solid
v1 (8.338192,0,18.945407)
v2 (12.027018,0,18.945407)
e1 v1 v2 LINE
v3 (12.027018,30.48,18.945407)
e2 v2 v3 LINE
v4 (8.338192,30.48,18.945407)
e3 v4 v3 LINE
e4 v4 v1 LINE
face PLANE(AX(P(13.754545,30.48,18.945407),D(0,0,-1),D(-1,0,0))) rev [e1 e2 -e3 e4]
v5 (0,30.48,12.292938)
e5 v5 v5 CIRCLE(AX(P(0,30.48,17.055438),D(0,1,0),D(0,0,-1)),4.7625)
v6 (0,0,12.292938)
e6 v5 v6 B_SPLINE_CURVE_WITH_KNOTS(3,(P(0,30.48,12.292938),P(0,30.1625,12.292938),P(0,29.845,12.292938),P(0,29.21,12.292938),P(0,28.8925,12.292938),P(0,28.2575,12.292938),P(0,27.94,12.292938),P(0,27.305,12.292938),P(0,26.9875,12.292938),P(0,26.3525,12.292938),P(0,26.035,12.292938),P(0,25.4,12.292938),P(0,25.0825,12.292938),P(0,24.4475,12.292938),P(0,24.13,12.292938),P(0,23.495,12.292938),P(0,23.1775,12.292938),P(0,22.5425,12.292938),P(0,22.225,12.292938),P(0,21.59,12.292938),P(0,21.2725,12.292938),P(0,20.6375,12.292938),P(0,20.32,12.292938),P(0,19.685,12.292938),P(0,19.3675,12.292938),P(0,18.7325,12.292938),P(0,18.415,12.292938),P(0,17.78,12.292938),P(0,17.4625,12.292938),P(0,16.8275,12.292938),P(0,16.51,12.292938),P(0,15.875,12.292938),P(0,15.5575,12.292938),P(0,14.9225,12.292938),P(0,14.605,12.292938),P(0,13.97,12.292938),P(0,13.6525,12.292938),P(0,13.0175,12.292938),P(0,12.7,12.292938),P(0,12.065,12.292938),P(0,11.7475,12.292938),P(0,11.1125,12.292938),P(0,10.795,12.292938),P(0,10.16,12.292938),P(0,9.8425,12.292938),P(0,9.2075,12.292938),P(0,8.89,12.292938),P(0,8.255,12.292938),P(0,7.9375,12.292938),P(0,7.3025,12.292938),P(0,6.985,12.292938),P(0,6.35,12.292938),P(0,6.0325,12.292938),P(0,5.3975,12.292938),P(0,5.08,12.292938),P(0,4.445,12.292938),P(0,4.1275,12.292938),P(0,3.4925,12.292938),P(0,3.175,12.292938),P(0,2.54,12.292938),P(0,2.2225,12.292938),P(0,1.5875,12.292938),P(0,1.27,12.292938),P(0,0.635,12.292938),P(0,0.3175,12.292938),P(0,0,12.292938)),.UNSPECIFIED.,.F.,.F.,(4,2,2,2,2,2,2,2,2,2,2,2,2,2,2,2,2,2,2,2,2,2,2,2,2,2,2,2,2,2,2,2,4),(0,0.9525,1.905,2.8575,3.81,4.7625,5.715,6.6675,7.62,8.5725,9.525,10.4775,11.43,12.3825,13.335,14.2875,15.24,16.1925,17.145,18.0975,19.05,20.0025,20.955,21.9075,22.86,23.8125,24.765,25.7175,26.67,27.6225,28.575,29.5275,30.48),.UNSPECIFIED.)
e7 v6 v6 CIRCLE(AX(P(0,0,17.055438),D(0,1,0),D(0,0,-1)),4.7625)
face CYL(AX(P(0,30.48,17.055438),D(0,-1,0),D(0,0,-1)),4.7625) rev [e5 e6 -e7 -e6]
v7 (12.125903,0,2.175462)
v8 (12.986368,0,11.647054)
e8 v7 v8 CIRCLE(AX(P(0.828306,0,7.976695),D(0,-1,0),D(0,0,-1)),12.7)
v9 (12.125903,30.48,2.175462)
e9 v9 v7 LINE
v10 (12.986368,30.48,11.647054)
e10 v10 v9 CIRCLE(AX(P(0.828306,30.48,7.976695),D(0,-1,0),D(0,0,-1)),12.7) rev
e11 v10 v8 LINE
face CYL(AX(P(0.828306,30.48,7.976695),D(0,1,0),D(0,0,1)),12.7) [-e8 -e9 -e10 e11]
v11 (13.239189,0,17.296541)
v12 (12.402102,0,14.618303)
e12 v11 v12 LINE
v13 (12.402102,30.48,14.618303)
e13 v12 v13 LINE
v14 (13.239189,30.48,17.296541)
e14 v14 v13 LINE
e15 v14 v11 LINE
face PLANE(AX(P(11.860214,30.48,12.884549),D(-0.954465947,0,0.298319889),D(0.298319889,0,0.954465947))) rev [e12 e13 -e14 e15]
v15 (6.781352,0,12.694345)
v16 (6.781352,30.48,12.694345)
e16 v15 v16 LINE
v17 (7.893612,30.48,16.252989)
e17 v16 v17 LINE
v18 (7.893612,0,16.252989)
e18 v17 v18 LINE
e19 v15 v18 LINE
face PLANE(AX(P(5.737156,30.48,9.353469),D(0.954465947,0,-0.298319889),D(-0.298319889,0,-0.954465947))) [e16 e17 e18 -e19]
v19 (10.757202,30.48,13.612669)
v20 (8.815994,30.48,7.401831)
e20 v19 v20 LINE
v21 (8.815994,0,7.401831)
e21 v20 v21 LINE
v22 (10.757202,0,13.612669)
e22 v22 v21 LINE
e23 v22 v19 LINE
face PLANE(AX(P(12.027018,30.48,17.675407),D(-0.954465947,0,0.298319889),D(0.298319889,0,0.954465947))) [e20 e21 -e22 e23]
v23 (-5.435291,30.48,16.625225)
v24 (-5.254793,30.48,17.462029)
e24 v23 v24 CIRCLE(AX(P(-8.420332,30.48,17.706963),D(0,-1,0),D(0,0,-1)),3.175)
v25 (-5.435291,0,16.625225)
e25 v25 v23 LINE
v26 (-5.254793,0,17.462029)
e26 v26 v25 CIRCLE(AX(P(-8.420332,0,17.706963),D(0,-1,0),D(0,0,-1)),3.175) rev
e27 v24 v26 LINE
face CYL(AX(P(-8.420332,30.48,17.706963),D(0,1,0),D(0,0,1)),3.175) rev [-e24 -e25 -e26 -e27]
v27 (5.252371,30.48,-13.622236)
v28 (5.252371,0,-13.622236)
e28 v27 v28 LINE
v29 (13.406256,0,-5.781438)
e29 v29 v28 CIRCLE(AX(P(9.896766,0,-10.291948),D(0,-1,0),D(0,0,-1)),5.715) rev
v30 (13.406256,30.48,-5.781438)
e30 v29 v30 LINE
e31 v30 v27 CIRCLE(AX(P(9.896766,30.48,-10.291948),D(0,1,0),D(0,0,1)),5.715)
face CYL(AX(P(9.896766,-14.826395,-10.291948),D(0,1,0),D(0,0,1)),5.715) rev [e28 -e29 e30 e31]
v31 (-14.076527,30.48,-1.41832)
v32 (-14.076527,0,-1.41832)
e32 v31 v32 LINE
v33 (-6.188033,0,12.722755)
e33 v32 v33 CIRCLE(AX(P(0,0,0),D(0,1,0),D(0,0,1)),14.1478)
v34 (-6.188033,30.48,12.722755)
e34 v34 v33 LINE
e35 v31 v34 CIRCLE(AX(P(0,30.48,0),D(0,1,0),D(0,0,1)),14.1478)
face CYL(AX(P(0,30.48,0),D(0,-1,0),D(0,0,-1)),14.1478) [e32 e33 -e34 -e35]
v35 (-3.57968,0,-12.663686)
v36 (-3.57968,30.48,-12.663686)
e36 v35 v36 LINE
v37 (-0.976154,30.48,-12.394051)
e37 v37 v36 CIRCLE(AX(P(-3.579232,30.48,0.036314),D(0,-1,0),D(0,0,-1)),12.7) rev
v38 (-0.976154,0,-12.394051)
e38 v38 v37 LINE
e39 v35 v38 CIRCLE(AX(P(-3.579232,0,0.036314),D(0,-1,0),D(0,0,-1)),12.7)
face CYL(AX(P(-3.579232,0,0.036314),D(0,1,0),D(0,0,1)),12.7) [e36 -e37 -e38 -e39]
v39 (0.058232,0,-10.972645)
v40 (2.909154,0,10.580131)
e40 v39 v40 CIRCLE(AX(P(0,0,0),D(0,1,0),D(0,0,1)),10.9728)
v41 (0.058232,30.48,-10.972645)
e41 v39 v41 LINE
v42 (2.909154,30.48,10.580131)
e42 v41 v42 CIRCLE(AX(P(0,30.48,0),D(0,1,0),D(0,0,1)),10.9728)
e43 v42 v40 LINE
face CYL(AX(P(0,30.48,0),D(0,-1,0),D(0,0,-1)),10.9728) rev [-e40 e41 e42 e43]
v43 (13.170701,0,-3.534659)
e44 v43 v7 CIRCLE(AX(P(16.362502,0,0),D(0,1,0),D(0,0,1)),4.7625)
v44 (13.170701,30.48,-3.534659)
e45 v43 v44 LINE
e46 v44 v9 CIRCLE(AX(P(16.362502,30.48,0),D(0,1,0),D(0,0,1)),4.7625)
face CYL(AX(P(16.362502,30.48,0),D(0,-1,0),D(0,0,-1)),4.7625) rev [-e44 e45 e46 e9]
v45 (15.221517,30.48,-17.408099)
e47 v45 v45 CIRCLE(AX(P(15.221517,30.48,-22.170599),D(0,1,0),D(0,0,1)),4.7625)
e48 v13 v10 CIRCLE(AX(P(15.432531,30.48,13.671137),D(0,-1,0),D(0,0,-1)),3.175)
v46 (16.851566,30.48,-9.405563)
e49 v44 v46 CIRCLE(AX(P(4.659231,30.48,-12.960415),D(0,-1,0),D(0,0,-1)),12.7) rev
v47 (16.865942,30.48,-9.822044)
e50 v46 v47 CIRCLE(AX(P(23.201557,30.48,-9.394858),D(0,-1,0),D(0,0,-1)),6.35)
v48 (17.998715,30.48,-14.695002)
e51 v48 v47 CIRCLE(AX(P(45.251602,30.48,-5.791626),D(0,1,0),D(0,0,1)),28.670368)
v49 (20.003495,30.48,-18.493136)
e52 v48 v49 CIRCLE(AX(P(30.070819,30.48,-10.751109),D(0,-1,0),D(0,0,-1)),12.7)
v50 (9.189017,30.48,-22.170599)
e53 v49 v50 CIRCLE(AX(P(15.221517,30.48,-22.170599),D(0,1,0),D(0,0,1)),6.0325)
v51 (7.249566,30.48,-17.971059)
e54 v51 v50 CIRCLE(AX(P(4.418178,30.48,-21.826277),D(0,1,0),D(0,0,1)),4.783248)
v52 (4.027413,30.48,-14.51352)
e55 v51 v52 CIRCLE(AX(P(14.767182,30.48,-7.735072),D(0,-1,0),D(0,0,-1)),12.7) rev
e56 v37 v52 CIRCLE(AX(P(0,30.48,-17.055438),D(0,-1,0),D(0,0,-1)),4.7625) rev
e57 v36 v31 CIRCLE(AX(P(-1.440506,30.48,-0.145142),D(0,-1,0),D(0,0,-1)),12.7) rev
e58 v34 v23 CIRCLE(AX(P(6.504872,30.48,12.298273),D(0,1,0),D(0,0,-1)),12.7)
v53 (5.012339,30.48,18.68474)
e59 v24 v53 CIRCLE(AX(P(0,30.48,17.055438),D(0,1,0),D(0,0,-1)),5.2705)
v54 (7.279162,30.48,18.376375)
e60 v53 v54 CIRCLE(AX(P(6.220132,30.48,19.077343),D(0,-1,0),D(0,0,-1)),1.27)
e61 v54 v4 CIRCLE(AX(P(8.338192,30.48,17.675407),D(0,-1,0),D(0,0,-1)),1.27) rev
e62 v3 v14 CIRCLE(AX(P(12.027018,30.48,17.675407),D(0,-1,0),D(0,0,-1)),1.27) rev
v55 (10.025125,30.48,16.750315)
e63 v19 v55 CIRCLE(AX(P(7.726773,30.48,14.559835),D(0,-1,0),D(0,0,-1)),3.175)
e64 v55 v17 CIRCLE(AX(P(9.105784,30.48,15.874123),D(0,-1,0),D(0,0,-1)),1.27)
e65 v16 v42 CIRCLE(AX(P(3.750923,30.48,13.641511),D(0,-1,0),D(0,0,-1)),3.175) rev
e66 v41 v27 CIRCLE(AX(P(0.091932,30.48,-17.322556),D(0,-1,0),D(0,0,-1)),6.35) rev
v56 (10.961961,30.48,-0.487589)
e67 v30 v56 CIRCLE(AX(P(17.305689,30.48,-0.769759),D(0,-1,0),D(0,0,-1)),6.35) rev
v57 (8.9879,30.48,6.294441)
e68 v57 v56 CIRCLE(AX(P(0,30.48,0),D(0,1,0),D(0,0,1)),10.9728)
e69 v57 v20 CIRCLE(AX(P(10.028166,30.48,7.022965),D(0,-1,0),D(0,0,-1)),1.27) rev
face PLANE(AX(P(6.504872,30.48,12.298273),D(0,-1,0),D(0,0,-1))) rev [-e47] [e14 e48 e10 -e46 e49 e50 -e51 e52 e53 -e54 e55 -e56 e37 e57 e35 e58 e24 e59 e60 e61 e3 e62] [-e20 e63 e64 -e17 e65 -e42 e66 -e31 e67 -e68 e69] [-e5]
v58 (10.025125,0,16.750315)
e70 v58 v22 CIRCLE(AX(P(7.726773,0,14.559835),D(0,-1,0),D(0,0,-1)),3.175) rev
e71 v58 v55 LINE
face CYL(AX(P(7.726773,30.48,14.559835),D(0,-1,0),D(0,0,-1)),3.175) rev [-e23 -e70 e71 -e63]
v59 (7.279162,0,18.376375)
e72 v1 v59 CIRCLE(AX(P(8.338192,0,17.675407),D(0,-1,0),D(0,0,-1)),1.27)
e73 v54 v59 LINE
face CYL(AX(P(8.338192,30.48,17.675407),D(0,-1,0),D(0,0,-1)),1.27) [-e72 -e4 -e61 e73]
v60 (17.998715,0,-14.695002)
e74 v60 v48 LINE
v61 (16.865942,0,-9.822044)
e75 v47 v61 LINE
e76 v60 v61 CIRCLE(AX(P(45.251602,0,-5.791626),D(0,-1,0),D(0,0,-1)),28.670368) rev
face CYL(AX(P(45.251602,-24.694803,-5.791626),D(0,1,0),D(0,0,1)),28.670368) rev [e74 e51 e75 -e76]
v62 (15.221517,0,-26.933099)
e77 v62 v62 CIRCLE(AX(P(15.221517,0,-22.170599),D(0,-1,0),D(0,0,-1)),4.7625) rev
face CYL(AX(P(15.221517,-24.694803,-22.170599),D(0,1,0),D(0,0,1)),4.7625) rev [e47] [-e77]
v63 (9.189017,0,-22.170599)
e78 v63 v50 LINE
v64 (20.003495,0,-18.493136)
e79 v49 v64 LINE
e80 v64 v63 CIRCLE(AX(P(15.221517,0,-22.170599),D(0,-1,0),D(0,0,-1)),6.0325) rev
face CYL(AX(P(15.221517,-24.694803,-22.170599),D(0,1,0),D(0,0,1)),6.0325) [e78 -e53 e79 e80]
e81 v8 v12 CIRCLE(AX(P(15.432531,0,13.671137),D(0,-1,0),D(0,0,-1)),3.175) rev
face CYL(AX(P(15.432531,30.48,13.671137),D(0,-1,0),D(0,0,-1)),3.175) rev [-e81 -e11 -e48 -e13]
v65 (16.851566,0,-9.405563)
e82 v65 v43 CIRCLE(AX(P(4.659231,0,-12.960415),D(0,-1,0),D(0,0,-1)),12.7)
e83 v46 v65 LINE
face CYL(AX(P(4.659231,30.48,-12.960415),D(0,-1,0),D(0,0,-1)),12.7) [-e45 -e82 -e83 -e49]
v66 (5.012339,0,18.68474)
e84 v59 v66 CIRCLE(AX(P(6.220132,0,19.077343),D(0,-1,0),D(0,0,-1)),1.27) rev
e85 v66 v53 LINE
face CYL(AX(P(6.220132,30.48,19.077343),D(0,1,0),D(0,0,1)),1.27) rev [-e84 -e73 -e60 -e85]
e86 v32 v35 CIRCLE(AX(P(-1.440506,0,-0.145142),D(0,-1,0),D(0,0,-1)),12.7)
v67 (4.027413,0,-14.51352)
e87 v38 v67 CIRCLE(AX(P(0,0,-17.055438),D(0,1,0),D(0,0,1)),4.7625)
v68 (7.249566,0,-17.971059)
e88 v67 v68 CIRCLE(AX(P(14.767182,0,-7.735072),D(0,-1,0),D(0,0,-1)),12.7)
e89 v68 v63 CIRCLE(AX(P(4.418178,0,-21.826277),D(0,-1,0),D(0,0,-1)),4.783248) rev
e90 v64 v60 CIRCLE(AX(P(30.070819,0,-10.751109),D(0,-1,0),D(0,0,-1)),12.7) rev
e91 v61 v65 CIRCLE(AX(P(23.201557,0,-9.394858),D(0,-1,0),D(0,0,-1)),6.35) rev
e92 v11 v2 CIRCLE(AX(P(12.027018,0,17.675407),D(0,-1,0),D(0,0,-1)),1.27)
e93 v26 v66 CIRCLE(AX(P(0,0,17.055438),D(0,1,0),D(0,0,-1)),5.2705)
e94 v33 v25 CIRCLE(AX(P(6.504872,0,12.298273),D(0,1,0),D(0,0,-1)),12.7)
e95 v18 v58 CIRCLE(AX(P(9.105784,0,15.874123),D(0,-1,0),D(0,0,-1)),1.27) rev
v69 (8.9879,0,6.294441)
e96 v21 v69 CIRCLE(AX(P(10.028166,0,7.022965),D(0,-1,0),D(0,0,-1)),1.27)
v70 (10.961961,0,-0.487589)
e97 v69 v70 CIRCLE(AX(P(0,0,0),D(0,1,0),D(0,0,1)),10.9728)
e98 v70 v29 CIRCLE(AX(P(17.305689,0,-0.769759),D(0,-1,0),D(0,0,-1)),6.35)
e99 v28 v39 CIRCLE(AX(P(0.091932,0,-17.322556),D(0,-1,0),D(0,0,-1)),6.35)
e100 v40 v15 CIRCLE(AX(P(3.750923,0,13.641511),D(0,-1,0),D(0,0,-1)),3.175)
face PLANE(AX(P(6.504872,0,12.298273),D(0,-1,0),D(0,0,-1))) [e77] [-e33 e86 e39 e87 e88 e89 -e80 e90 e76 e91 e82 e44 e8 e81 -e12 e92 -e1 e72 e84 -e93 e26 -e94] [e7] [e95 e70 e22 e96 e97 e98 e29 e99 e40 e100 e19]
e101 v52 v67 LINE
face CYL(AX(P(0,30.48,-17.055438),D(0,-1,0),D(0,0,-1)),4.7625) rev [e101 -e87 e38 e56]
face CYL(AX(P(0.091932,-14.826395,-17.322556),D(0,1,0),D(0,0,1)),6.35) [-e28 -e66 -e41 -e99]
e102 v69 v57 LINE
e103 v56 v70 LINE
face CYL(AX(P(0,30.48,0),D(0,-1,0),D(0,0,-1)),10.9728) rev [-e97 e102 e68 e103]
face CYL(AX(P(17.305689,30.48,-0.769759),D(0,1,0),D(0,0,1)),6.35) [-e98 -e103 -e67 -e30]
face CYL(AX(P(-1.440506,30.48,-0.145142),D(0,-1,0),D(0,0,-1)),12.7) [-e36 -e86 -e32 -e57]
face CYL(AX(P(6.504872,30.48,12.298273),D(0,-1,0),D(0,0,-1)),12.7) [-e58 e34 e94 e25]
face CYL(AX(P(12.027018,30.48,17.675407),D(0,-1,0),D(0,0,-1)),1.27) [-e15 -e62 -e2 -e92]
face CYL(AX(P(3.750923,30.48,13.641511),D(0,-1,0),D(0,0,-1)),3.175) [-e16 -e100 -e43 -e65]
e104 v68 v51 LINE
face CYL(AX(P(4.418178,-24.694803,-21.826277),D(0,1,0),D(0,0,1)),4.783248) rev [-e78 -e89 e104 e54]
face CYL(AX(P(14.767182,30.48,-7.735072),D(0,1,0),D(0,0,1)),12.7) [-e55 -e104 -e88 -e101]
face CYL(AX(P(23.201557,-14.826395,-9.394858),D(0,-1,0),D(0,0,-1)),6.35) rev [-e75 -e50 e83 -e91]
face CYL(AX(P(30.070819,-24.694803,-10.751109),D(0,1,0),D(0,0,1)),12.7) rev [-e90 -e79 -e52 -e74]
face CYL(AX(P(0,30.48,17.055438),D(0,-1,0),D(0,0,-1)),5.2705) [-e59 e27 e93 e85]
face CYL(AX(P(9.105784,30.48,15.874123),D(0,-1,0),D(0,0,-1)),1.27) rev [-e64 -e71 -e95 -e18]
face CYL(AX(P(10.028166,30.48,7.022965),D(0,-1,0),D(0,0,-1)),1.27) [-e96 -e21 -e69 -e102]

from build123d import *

# Parameters (mm, degrees)
SKETCH1_R               = 4.7625
BOSS_EXTRUDE2_DEPTH     = 30.48
FILLET1_R               = 3.175
FILLET3_R               = 1.27
FILLET4_R               = 3.175
FILLET5_R               = 1.27
FILLET6_R               = 1.27
BOSS_EXTRUDE9_START     = -30.48
BOSS_EXTRUDE9_DEPTH     = 30.48
CUT_EXTRUDE6_START      = -30.48
CUT_EXTRUDE6_DEPTH      = 30.48
FILLET9_R               = 6.35
CUT_EXTRUDE7_DEPTH      = 44.536935081
CUT_EXTRUDE7_DEPTH_BACK = 44.536935081
BOSS_EXTRUDE11_START    = -30.48
SKETCH4_R               = 4.7625
BOSS_EXTRUDE11_DEPTH    = 30.48
FILLET10_R              = 12.7
FILLET11_R              = 12.7
CUT_EXTRUDE8_DEPTH      = 47.823412819
CUT_EXTRUDE8_DEPTH_BACK = 47.823412819
FILLET12_R              = 12.7


with BuildPart() as part:
    # Sketch1 → Boss-Extrude2 (new body)
    with BuildSketch(Plane(origin=(0, 0, 0), x_dir=(1, 0, 0), z_dir=(0, 1, 0))):
        with BuildLine():
            Line((11.860213807, -12.884548704), (13.754545104, -18.945407466))
            Line((13.754545104, -18.945407466), (7.404545104, -18.945407466))
            Line((7.404545104, -18.945407466), (6.640447212, -16.500698134))
            ThreePointArc((6.640447212, -16.500698134), (5.961240353, -16.792309403), (5.2705, -17.055438375))
            ThreePointArc((5.2705, -17.055438375), (0, -22.325938375), (-5.2705, -17.055438375))
            ThreePointArc((-5.2705, -17.055438375), (-5.919586773, -14.929400926), (-6.188032569, -12.722755117))
            ThreePointArc((-6.188032569, -12.722755117), (-14.1478, 0), (-6.188032569, 12.722755117))
            ThreePointArc((-6.188032569, 12.722755117), (-5.919586773, 14.929400926), (-5.2705, 17.055438375))
            ThreePointArc((-5.2705, 17.055438375), (0, 22.325938375), (5.2705, 17.055438375))
            ThreePointArc((5.2705, 17.055438375), (12.040379738, 12.314885712), (16.362502035, 5.2705))
            ThreePointArc((16.362502035, 5.2705), (21.633002035, 0), (16.362502035, -5.2705))
            ThreePointArc((16.362502035, -5.2705), (14.592418813, -9.361982053), (11.860213807, -12.884548704))
        make_face()
        with Locations(Location((0, 17.055438375, 0), (0, 0, 90))):
            Circle(SKETCH1_R, mode=Mode.SUBTRACT)
        with Locations(Location((16.362502035, 0, 0), (0, 0, 90))):
            Circle(SKETCH1_R, mode=Mode.SUBTRACT)
        with Locations(Location((0, -17.055438375, 0), (0, 0, 90))):
            Circle(SKETCH1_R, mode=Mode.SUBTRACT)
        with BuildLine():
            Line((5.737156066, -9.353468881), (8.338191551, -17.675407466))
            Line((8.338191551, -17.675407466), (12.027017511, -17.675407466))
            Line((12.027017511, -17.675407466), (8.623309815, -6.785342119))
            ThreePointArc((8.623309815, -6.785342119), (-7.294145861, 8.197424961), (5.737156066, -9.353468881))
        make_face(mode=Mode.SUBTRACT)
    extrude(amount=BOSS_EXTRUDE2_DEPTH)

    # Fillet1
    # the kernel refuses this fillet: 3.175 mm, written as the material it adds along each edge
    with BuildSketch(Plane(origin=(-6.188032569, 0, -12.722755117), x_dir=(-0.8747186698844794, 0, 0.4846310437389738), z_dir=(0, 1, 0))) as fillet1_piece_1:
        with BuildLine():
            CenterArc((1.675106808, -3.170499128), FILLET1_R, 93.05116293, 49.316383357)
            ThreePointArc((-0.839315123, -1.231863693), (-0.401568779, -0.628256415), (0, 0))
            ThreePointArc((0, 0), (0.753054473, -0.020055884), (1.506108946, 0))
        make_face()
    extrude(amount=30.48)
    with BuildSketch(Plane(origin=(-5.2705, 0, -17.055438375), x_dir=(-0.35770128840140486, 0, 0.9338360607065755), z_dir=(0, 1, 0))) as fillet1_piece_2:
        with BuildLine():
            CenterArc((0.51828136, -3.174477714), FILLET1_R, 91.039263795, 15.495369937)
            ThreePointArc((-0.385307362, -0.130770695), (-0.191391238, -0.069105054), (0, 0))
            ThreePointArc((0, 0), (0.230347271, -0.002089143), (0.460694542, 0))
        make_face()
    extrude(amount=30.48)
    with BuildSketch(Plane(origin=(5.2705, 0, -17.055438375), x_dir=(-0.12720688847868244, 0, -0.9918762057452392), z_dir=(0, 1, 0))) as fillet1_piece_3:
        with BuildLine():
            CenterArc((1.744769682, -3.149206953), FILLET1_R, 97.308218729, 47.663807195)
            ThreePointArc((-0.855148612, -1.326832167), (-0.414685297, -0.671723102), (0, 0))
            ThreePointArc((0, 0), (0.670443906, -0.042816458), (1.340887811, 0))
        make_face()
    extrude(amount=30.48)
    with BuildSketch(Plane(origin=(16.362502035, 0, -5.2705), x_dir=(-0.3771647323765371, 0, -0.9261461896759794), z_dir=(0, 1, 0))) as fillet1_piece_4:
        with BuildLine():
            CenterArc((1.804499427, -3.172306197), FILLET1_R, 92.360366346, 49.97819677)
            ThreePointArc((-0.70894152, -1.232399084), (-0.312723775, -0.640214629), (0, 0))
            ThreePointArc((0, 0), (0.8368693, -0.017240341), (1.673738599, 0))
        make_face()
    extrude(amount=30.48)
    with BuildSketch(Plane(origin=(16.362502035, 0, 5.2705), x_dir=(0.9898341628287173, 0, -0.14222633404954374), z_dir=(0, 1, 0))) as fillet1_piece_5:
        with BuildLine():
            CenterArc((1.950776398, -3.142723467), FILLET1_R, 98.176695151, 51.81827723)
            ThreePointArc((-0.798714948, -1.554982197), (-0.380235314, -0.787313176), (0, 0))
            ThreePointArc((0, 0), (0.749603894, -0.053579045), (1.499207787, 0))
        make_face()
    extrude(amount=30.48)
    with BuildSketch(Plane(origin=(11.860213807, 0, 12.884548704), x_dir=(0.29831988928740816, 0, 0.9544659468286695), z_dir=(0, 1, 0))) as fillet1_piece_6:
        with BuildLine():
            CenterArc((1.816465361, 3.175), FILLET1_R, 213.037149694, 56.962850306)
            ThreePointArc((-0.845191928, 1.444044923), (-0.405599886, 0.731970177), (0, 0))
            Line((0, 0), (1.816465361, 0))
        make_face()
    extrude(amount=30.48)
    with BuildSketch(Plane(origin=(5.2705, 0, 17.055438375), x_dir=(0.9268908474954334, 0, -0.37533099636080863), z_dir=(0, 1, 0))) as fillet1_piece_7:
        with BuildLine():
            CenterArc((1.820147869, -3.156511003), FILLET1_R, 96.186334825, 46.370096176)
            ThreePointArc((-0.700651409, -1.226175281), (-0.30907029, -0.636661485), (0, 0))
            ThreePointArc((0, 0), (0.73900137, -0.015364429), (1.47800274, 0))
        make_face()
    extrude(amount=30.48)
    with BuildSketch(Plane(origin=(-5.2705, 0, 17.055438375), x_dir=(0.038601082712793416, 0, 0.999254700471006), z_dir=(0, 1, 0))) as fillet1_piece_8:
        with BuildLine():
            CenterArc((0.52945245, -3.172633674), FILLET1_R, 92.212228742, 15.495369937)
            ThreePointArc((-0.436253651, -0.148061518), (-0.217455401, -0.076009068), (0, 0))
            ThreePointArc((0, 0), (0.203447006, -0.003928101), (0.406894013, 0))
        make_face()
    extrude(amount=30.48)
    # the kernel refuses this fillet: 3.175 mm, written as the material it takes off along each edge
    with BuildSketch(Plane(origin=(5.737156066, -8.75064331, 9.353468881), x_dir=(0.29831988928740744, 0, 0.9544659468286697), z_dir=(0, 1, 0))) as fillet1_2_piece_1:
        with BuildLine():
            CenterArc((3.500257324, -3.175), FILLET1_R, 90, 88.017608619)
            ThreePointArc((0.327157544, -3.065169276), (0.271751922, -1.521038893), (0, 0))
            Line((0, 0), (3.500257324, 0))
        make_face()
    extrude(amount=47.98128662, mode=Mode.SUBTRACT)

    # Fillet3
    fillet3_edges = [part.edges().sort_by_distance(p)[0] for p in [
        (13.754545104, 15.24, 18.945407466),
        (7.404545104, 15.24, 18.945407466),
    ]]
    fillet(fillet3_edges, radius=FILLET3_R)

    # Fillet4
    # the kernel refuses this fillet: 3.175 mm, written as the material it adds along each edge
    with BuildSketch(Plane(origin=(12.027017511, 0, 17.675407466), x_dir=(-0.29831988928740777, 0, -0.9544659468286695), z_dir=(0, 1, 0))) as fillet4_piece_1:
        with BuildLine():
            CenterArc((4.256556411, 3.175), FILLET4_R, 173.746252409, 96.253747591)
            Line((1.100450152, 3.520858762), (1.037328027, 3.527775938))
            ThreePointArc((1.037328027, 3.527775938), (0.489616488, 1.779372694), (-0.060608588, 0.018943313))
            Line((-0.060608588, 0.018943313), (0, -0.0635))
            Line((0, -0.0635), (4.256556411, -0.0635))
            Line((4.256556411, -0.0635), (4.256556411, 0))
        make_face()
    extrude(amount=30.48)

    # Fillet5
    fillet5_edges = [part.edges().sort_by_distance(p)[0] for p in [
        (8.338191551, 15.24, 17.675407466),
    ]]
    fillet(fillet5_edges, radius=FILLET5_R)

    # Fillet6
    fillet6_edges = [part.edges().sort_by_distance(p)[0] for p in [
        (6.640447212, 15.24, 16.500698134),
        (8.623309815, 15.24, 6.785342119),
    ]]
    fillet(fillet6_edges, radius=FILLET6_R)

    # Sketch2 → Boss-Extrude9 (add)
    with BuildSketch(Plane(origin=(0, 30.48, 0), x_dir=(1, 0, 0), z_dir=(0, 1, 0)).offset(BOSS_EXTRUDE9_START)):
        with BuildLine():
            ThreePointArc((7.943426233, 15.662766674), (13.175324303, 14.973004025), (15.611766116, 10.291948459))
            ThreePointArc((15.611766116, 10.291948459), (15.492196473, 9.129027942), (15.138490831, 8.014768839))
            ThreePointArc((15.138490831, 8.014768839), (15.444654673, 7.422560084), (15.731226864, 6.820626626))
            ThreePointArc((15.731226864, 6.820626626), (15.781158654, 6.716236617), (15.834861283, 6.61373547))
            ThreePointArc((15.834861283, 6.61373547), (16.614943687, 8.379799111), (16.881766116, 10.291948459))
            ThreePointArc((16.881766116, 10.291948459), (13.476256049, 16.290071233), (6.580412696, 16.439470316))
            ThreePointArc((6.580412696, 16.439470316), (6.637545403, 16.407150651), (6.69533405, 16.376019005))
            ThreePointArc((6.69533405, 16.376019005), (7.325689413, 16.030433186), (7.943426233, 15.662766674))
        make_face()
    extrude(amount=BOSS_EXTRUDE9_DEPTH)

    # Sketch2<12> → Cut-Extrude6 (cut)
    with BuildSketch(Plane(origin=(0, 30.48, 0), x_dir=(1, 0, 0), z_dir=(0, 1, 0)).offset(CUT_EXTRUDE6_START)):
        with BuildLine():
            ThreePointArc((15.138490831, 8.014768839), (12.043511127, 12.311557951), (7.943426233, 15.662766674))
            ThreePointArc((7.943426233, 15.662766674), (5.173639716, 13.509603196), (4.183683511, 10.143920944))
            ThreePointArc((4.183683511, 10.143920944), (7.605607592, 7.90930294), (9.972426866, 4.577449316))
            ThreePointArc((9.972426866, 4.577449316), (13.062589614, 5.533925069), (15.138490831, 8.014768839))
        make_face()
    extrude(amount=CUT_EXTRUDE6_DEPTH, mode=Mode.SUBTRACT)

    # Fillet9
    fillet9_edges = [part.edges().sort_by_distance(p)[0] for p in [
        (6.580412696, 15.24, -16.439470316),
        (15.834861283, 15.24, -6.61373547),
        (9.972426866, 15.24, -4.577449316),
        (4.183683511, 15.24, -10.143920944),
    ]]
    fillet(fillet9_edges, radius=FILLET9_R)

    # Sketch3 → Cut-Extrude7 (cut, two sides: drawn at the far end of the back side and taken through both)
    with BuildSketch(Plane(origin=(0, 30.48, 0), x_dir=(1, 0, 0), z_dir=(0, 1, 0)).offset(-CUT_EXTRUDE7_DEPTH_BACK)):
        with BuildLine():
            Line((-7.505454184, 11.992847966), (-2.296148987, 12.883016287))
            ThreePointArc((-2.296148987, 12.883016287), (2.423426985, 12.955632538), (4.7625, 17.055438375))
            Line((4.7625, 17.055438375), (9.734184624, 17.275056095))
            ThreePointArc((9.734184624, 17.275056095), (-1.208436668, 22.214922829), (-7.505454184, 11.992847966))
        make_face()
    extrude(amount=CUT_EXTRUDE7_DEPTH + CUT_EXTRUDE7_DEPTH_BACK, mode=Mode.SUBTRACT)

    # Sketch4 → Boss-Extrude11 (add)
    with BuildSketch(Plane(origin=(0, 30.48, 0), x_dir=(1, 0, 0), z_dir=(0, 1, 0)).offset(BOSS_EXTRUDE11_START)):
        with BuildLine():
            ThreePointArc((16.86594215, 9.822043775), (17.712963238, 13.767422556), (19.105519309, 17.554802394))
            ThreePointArc((19.105519309, 17.554802394), (17.767180424, 27.639662161), (9.18901652, 22.17059903))
            ThreePointArc((9.18901652, 22.17059903), (9.198998035, 21.978650402), (9.201259866, 21.786455734))
            ThreePointArc((9.201259866, 21.786455734), (7.906472539, 18.553470941), (4.7625, 17.055438375))
            Line((4.7625, 17.055438375), (9.734184624, 17.275056095))
            ThreePointArc((9.734184624, 17.275056095), (14.943475982, 15.121124841), (16.86594215, 9.822043775))
        make_face()
        with Locations(Location((15.22151652, 22.17059903, 0), (0, 0, 270))):
            Circle(SKETCH4_R, mode=Mode.SUBTRACT)
    extrude(amount=BOSS_EXTRUDE11_DEPTH)

    # Fillet10
    fillet10_edges = [part.edges().sort_by_distance(p)[0] for p in [
        (4.7625, 15.24, -17.055438375),
        (19.105519309, 15.24, -17.554802394),
        (-7.505454184, 15.24, -11.992847966),
    ]]
    fillet(fillet10_edges, radius=FILLET10_R)

    # Fillet11
    # the kernel refuses this fillet: 12.7 mm, written as the material it takes off along each edge
    with BuildSketch(Plane(origin=(-2.296148987, -3.519120011, -12.883016287), x_dir=(0.9377307104980771, 0, 0.3473630875449655), z_dir=(0, 1, 0))) as fillet11_piece_1:
        with BuildLine():
            CenterArc((3.28451201, -12.560548615), FILLET11_R, 98.498560753, 11.829576247)
            Line((-1.127419619, -0.651524335), (-1.215658252, -0.413343849))
            ThreePointArc((-1.215658252, -0.413343849), (-0.690798794, -0.105843114), (-0.127088985, 0.219919053))
            Line((-0.127088985, 0.219919053), (0.03753728, 0.251210972))
            ThreePointArc((0.03753728, 0.251210972), (0.703824002, 0.201705731), (1.370110724, 0.251210972))
            Line((1.370110724, 0.251210972), (1.407648004, 0))
        make_face()
    extrude(amount=37.518240022, mode=Mode.SUBTRACT)

    # Sketch6 → Cut-Extrude8 (cut, two sides: drawn at the far end of the back side and taken through both)
    with BuildSketch(Plane(origin=(0, 30.48, 0), x_dir=(1, 0, 0), z_dir=(0, 1, 0)).offset(-CUT_EXTRUDE8_DEPTH_BACK)):
        Polygon((16.86594215, 9.822043775), (16.362502035, -4.7625), (12.986367949, -11.647054469), (20.424487513, -6.754467336), (23.855992578, 4.7625), align=None)
    extrude(amount=CUT_EXTRUDE8_DEPTH + CUT_EXTRUDE8_DEPTH_BACK, mode=Mode.SUBTRACT)

    # Fillet12
    # the kernel refuses this fillet: 12.7 mm, written as the material it takes off along each edge
    with BuildSketch(Plane(origin=(16.362502035, -19.16953501, 4.7625), x_dir=(-0.44029942358179885, 0, 0.897850999661712), z_dir=(0, 1, 0))) as fillet12_piece_1:
        with BuildLine():
            CenterArc((9.725565923, -12.532184847), FILLET12_R, 99.324611407, 43.978540744)
            Line((-0.457402302, -4.942905689), (-0.661061666, -4.791120106))
            ThreePointArc((-0.661061666, -4.791120106), (0.213304295, -2.51235476), (-0.228054154, -0.111836054))
            Line((-0.228054154, -0.111836054), (0, 0.254))
            ThreePointArc((0, 0.254), (3.833907002, 0.254), (7.626658966, 0.250643697))
            Line((7.626658966, 0.250643697), (7.667814004, 0))
        make_face()
    extrude(amount=68.819070021, mode=Mode.SUBTRACT)
    with BuildSketch(Plane(origin=(16.690901757, 42.122927143, -4.751164054), x_dir=(-0.9451540669307225, 0, 0.3266248456016706), z_dir=(0, -1, 0))) as fillet12_piece_2:
        with BuildLine():
            CenterArc((8.690437274, 11.688849387), FILLET12_R, 215.318855045, 31.663113493)
            Line((-1.67209449, 4.346647031), (-1.879345125, 4.199802984))
            ThreePointArc((-1.879345125, 4.199802984), (-1.073111415, 2.082128235), (-0.23706417, -0.09119528))
            Line((-0.23706417, -0.09119528), (0.099319283, -0.233776988))
            ThreePointArc((0.099319283, -0.233776988), (1.862236559, 0.12518148), (3.625153834, -0.233776988))
            Line((3.625153834, -0.233776988), (3.724473117, 0))
        make_face()
    extrude(amount=53.765854287, mode=Mode.SUBTRACT)


solid = part.part
